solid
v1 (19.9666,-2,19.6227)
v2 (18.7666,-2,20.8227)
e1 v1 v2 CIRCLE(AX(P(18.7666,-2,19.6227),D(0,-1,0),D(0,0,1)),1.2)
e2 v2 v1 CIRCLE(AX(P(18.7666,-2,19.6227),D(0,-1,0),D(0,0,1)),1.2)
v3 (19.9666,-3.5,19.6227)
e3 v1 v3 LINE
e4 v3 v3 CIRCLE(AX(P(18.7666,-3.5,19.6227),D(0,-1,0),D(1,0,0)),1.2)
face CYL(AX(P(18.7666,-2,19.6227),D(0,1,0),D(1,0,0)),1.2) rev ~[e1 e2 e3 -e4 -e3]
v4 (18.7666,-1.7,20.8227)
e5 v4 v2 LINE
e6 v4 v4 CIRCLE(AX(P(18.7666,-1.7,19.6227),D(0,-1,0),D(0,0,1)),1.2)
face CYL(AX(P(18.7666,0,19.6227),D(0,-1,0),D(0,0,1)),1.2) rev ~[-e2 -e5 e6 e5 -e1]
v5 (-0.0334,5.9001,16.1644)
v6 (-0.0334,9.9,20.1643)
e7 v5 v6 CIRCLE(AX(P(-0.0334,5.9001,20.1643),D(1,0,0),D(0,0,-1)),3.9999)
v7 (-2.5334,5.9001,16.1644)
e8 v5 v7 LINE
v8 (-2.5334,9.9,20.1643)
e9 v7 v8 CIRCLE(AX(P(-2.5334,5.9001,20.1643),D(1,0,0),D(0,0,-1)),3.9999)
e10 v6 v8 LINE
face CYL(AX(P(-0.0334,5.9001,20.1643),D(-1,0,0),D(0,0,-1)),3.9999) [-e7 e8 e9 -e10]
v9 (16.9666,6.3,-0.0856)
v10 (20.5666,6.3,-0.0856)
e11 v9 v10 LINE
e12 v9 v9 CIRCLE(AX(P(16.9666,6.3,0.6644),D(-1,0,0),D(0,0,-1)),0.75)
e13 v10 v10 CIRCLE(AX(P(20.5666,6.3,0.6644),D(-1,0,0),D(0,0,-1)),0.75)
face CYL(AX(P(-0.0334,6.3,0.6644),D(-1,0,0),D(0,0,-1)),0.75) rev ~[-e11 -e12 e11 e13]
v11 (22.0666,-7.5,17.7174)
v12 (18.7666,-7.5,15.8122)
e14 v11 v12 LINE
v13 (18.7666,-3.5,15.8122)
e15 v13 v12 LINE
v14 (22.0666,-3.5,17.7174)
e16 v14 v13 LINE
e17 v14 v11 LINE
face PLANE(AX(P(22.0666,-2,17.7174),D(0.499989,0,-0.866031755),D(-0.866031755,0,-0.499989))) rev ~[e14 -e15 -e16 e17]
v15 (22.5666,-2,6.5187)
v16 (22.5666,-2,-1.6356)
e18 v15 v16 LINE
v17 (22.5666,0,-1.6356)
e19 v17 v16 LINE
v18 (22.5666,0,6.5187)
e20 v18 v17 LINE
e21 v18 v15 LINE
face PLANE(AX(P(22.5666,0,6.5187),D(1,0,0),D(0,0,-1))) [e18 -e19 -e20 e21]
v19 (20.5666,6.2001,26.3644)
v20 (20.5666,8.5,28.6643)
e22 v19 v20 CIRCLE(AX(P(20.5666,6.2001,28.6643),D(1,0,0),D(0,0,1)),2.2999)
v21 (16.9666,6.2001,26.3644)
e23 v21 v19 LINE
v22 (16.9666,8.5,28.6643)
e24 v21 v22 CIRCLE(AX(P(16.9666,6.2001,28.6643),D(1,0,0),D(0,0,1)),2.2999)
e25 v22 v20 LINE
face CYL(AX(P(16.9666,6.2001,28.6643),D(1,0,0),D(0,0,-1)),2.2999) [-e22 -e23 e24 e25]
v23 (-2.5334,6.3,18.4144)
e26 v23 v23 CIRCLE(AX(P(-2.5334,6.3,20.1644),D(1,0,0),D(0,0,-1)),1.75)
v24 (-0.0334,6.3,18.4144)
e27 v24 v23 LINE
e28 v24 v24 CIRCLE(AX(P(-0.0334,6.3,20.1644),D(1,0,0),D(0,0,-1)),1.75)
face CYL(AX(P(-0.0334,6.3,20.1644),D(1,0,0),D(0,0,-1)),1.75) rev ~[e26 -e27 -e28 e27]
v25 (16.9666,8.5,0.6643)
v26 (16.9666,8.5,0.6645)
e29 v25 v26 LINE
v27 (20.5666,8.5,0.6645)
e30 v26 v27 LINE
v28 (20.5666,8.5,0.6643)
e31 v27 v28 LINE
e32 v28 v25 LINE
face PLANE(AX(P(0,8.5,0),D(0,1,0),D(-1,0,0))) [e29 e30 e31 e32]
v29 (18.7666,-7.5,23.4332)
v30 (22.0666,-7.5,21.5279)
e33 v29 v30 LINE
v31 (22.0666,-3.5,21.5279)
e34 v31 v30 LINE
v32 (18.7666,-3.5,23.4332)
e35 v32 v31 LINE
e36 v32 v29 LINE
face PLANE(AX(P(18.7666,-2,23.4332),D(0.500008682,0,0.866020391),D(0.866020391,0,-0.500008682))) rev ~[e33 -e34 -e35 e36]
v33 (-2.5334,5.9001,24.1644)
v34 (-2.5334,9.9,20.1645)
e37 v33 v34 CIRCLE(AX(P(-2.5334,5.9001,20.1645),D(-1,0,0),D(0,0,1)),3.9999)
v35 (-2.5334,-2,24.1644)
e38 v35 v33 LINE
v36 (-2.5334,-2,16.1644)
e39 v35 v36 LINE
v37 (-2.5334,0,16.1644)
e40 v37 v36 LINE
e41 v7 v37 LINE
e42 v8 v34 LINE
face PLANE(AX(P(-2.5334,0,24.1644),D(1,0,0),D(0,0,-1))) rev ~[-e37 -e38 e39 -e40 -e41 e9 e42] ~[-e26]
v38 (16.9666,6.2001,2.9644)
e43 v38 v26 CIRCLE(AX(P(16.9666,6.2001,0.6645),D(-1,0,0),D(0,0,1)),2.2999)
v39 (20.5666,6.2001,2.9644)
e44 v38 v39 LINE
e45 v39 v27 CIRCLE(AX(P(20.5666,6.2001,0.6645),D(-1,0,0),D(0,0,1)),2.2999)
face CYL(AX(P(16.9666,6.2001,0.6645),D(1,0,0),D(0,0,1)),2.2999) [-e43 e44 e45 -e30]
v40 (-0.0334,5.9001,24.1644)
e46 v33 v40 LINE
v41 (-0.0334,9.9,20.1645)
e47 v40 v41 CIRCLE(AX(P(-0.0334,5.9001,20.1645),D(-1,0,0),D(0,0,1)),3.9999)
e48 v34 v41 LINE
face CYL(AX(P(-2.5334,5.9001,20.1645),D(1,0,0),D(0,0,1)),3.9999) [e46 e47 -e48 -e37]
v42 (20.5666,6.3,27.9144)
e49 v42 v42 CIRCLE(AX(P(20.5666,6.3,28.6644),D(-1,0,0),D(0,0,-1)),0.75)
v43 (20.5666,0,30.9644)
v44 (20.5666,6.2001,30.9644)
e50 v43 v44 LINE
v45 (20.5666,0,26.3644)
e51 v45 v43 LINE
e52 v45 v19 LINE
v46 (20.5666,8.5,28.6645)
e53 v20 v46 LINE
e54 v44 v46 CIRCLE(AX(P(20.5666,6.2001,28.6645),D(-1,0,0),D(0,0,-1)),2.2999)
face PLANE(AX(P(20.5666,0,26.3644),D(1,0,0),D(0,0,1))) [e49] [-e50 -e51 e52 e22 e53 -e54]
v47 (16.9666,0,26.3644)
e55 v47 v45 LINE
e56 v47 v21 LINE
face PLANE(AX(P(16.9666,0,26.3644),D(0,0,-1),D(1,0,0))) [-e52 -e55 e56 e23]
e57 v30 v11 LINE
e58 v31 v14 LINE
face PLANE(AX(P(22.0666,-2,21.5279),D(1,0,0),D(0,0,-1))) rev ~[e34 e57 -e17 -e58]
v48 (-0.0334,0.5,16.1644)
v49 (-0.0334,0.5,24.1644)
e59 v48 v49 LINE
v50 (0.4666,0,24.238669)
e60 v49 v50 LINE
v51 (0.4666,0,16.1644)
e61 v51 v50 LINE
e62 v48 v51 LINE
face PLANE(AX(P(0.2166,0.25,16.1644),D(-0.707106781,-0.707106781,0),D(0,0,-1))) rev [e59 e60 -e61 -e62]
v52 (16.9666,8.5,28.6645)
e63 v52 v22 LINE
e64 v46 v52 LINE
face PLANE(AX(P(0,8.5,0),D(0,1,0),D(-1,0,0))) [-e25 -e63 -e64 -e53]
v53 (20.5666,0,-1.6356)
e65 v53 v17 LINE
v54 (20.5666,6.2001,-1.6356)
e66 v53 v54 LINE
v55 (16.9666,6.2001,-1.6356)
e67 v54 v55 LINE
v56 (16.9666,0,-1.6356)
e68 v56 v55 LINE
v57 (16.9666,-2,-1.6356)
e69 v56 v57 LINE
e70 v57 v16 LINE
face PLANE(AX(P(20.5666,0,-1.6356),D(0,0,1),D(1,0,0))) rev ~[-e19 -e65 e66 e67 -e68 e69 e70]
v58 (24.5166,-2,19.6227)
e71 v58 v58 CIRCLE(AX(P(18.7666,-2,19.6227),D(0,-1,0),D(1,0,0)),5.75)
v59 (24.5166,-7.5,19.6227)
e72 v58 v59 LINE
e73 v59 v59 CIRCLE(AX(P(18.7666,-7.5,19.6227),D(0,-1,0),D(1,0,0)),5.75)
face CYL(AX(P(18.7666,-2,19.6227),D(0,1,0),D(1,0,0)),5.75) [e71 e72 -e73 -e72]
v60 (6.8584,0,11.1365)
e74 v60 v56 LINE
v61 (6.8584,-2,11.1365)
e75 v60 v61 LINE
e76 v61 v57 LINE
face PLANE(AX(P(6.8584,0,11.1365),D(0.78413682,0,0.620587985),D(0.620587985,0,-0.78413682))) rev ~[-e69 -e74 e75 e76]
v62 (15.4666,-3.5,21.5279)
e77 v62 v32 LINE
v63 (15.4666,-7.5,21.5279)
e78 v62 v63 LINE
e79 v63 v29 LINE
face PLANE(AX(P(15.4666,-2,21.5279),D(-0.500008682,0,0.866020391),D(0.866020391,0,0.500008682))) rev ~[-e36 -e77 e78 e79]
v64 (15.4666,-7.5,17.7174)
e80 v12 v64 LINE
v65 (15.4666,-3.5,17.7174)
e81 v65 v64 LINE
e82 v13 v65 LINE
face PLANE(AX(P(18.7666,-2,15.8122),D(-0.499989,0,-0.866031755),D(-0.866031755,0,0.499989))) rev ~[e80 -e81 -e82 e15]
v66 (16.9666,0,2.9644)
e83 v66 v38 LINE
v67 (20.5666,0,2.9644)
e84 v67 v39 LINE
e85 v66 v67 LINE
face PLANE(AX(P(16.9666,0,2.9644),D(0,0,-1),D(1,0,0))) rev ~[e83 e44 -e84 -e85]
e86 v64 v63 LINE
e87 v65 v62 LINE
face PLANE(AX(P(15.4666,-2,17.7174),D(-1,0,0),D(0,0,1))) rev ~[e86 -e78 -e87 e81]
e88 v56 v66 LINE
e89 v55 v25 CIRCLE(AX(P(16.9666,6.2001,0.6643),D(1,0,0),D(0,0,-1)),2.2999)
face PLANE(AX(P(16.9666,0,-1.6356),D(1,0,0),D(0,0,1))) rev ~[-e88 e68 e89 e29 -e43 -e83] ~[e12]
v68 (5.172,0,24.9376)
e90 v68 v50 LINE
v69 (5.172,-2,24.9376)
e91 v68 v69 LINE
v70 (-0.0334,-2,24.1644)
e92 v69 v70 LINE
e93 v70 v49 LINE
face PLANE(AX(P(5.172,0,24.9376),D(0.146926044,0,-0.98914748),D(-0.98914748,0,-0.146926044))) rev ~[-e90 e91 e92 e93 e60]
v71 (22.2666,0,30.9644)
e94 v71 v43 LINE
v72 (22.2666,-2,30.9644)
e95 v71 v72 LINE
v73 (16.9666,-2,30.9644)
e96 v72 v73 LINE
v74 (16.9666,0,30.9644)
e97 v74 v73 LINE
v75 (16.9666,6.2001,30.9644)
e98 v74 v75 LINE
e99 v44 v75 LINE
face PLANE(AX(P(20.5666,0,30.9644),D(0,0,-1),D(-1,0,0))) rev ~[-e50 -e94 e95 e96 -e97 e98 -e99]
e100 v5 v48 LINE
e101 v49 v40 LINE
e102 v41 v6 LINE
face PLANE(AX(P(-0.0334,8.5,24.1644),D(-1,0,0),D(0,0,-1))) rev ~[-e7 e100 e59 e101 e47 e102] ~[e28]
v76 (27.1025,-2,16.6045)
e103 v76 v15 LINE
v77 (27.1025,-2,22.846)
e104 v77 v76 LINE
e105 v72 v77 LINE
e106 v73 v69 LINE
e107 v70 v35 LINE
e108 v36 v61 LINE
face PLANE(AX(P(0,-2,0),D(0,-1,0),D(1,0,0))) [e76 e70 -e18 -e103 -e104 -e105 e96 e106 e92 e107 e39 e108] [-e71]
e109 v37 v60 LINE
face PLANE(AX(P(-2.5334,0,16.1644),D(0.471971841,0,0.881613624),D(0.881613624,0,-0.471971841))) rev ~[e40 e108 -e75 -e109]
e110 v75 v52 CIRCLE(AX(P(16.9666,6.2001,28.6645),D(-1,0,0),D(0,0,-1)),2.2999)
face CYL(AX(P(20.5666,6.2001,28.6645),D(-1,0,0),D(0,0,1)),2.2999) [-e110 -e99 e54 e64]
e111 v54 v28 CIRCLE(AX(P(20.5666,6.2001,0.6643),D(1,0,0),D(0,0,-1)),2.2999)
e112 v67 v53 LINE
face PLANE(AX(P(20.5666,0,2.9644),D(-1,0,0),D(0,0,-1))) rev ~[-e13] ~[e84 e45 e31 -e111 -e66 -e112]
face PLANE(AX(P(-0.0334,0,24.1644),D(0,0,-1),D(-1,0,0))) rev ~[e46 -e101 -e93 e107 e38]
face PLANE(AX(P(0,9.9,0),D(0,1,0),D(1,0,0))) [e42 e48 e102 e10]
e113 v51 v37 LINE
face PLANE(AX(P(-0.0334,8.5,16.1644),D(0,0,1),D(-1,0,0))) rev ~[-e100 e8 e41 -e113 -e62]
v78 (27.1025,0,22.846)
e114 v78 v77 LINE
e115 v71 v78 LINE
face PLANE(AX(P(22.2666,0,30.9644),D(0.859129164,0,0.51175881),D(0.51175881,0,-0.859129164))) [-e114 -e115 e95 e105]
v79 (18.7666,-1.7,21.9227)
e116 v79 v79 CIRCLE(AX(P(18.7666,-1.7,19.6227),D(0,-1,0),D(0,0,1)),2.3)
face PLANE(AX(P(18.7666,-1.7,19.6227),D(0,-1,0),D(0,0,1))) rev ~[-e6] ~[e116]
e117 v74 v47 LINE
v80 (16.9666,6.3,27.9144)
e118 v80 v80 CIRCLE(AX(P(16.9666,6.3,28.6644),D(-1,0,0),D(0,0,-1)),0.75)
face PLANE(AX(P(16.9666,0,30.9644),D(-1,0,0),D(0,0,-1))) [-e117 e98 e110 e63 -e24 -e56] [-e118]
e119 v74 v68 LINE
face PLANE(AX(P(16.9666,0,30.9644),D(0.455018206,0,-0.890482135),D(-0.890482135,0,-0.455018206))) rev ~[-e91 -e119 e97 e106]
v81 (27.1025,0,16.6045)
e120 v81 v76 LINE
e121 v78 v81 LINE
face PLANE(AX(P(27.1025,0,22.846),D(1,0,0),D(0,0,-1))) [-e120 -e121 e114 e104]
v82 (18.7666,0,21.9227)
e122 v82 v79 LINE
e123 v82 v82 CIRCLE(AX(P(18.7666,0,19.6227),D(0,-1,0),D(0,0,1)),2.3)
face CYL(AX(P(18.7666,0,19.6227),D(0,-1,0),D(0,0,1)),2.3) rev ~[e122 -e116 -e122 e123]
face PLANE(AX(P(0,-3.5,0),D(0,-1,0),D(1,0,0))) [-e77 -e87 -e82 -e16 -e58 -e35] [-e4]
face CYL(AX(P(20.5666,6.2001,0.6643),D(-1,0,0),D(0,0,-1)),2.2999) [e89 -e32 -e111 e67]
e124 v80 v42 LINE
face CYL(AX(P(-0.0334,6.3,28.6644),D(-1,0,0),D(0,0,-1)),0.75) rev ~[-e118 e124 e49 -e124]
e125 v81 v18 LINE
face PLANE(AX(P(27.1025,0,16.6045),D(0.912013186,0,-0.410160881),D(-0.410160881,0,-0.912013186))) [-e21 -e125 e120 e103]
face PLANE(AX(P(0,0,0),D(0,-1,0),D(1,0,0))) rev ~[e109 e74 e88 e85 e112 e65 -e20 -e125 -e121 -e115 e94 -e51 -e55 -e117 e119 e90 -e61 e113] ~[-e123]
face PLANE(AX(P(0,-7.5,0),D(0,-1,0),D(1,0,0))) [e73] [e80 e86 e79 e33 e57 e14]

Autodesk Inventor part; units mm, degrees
ref_plane "YZ Plane" through (0, 0, 0) normal (1, 0, 0) x (0, 1, 0)
ref_plane "XZ Plane" through (0, 0, 0) normal (0, 1, 0) x (-1, 0, 0)
ref_plane "XY Plane" through (0, 0, 0) normal (0, 0, 1) x (1, 0, 0)
sketch "Sketch2" plane through (0, 0, 0) normal (0, 1, 0) x (-1, 0, 0)
  line L0 (2.5334, 16.1644) -> (0.0334, 16.1644)
  line L1 (0.0334, 16.1644) -> (0.0334, 24.1644)
  line L2 (0.0334, 24.1644) -> (2.5334, 24.1644)
  line L3 (2.5334, 24.1644) -> (2.5334, 16.1644)
  line L4 (-20.5666, -1.6356) -> (-16.9666, -1.6356)
  line L5 (-16.9666, -1.6356) -> (-16.9666, 2.9644)
  line L6 (-16.9666, 2.9644) -> (-20.5666, 2.9644)
  line L7 (-20.5666, 2.9644) -> (-20.5666, -1.6356)
  line L8 (-20.5666, 30.9644) -> (-16.9666, 30.9644)
  line L9 (-16.9666, 30.9644) -> (-16.9666, 26.3644)
  line L10 (-16.9666, 26.3644) -> (-20.5666, 26.3644)
  line L11 (-20.5666, 26.3644) -> (-20.5666, 30.9644)
  point P0 (0, 0)
  point P1 (-20.5666, 0.6644)
  point P2 (-20.5666, 28.6644)
  point P3 (0.0334, 20.1644)
  dimension "d4" = 4.6
  dimension "d5" = 3.6
  dimension "d6" = 2.5
  dimension "d7" = 8
  dimension "d8" = 28
  dimension "d9" = 8.5
  dimension "d59" = 20.6
extrude "Extrusion2" add sketch "Sketch2" along normal blind 8.5
sketch "Sketch3" plane through (0, 8.5, 0) normal (0, 1, 0) x (1, 0, 0)
  line L0 (-2.5334, -24.1644) -> (-0.0334, -24.1644)
  line L1 (-0.0334, -24.1644) -> (-0.0334, -16.1644)
  line L2 (-0.0334, -16.1644) -> (-2.5334, -16.1644)
  line L3 (-2.5334, -16.1644) -> (-2.5334, -24.1644)
  point P0 (0, 0)
extrude "Extrusion3" add sketch "Sketch3" along normal blind 1.4
fillet "Fillet1" radius 2.3 4 edges at (18.7666, 8.5, 30.9644) (18.7666, 8.5, 26.3644) (18.7666, 8.5, 2.9644) (18.7666, 8.5, -1.6356)
fillet "Fillet2" radius 4 2 edges at (-1.2834, 9.9, 24.1644) (-1.2834, 9.9, 16.1644)
sketch "Sketch4" plane through (-0.0334, 0, 24.1644) normal (1, 0, 0) x (0, 0, -1)
  line L0 (8, 0) -> (0, 0) projected
  line L1 (4, 0) -> (4, 9.2517) construction
  line L2 (-6.8, 0) -> (-2.2, 0) construction
  line L3 (25.8, 0) -> (21.2, 0) construction
  line L4 (-4.5, 0) -> (-4.5, 8.5) construction
  arc A0 (-2.2, 6.2) -> (-6.8, 6.2) centre (-4.5, 6.2) ccw construction
  line L5 (23.5, 0) -> (23.5, 8.5) construction
  circle A1 centre (4, 6.3) radius 1.75
  circle A2 centre (23.5, 6.3) radius 0.75
  circle A3 centre (-4.5, 6.3) radius 0.75
  point P0 (24.1644, 0)
  dimension "d17" = 3.5
  dimension "d19" = 1.5
  dimension "d20" = 1.5
  dimension "d21" = 6.3
  dimension "d22" = 6.3
  dimension "d23" = 6.3
extrude "Extrusion4" cut sketch "Sketch4" along normal through all both and the other way through all
sketch "Sketch5" plane through (0, 0, 0) normal (0, -1, 0) x (1, 0, 0)
  line L0 (-2.5334, 16.1644) -> (6.8584, 11.1365)
  line L1 (6.8584, 11.1365) -> (16.9666, -1.6356)
  line L2 (16.9666, -1.6356) -> (20.5666, -1.6356)
  line L3 (20.5666, -1.6356) -> (16.9666, -1.6356) projected
  line L4 (20.5666, -1.6356) -> (22.5666, -1.6356)
  line L5 (22.2666, 30.9644) -> (20.5666, 30.9644)
  line L6 (20.5666, 30.9644) -> (16.9666, 30.9644)
  line L7 (16.9666, 30.9644) -> (5.172, 24.9376)
  line L8 (5.172, 24.9376) -> (-0.0334, 24.1644)
  line L9 (-0.0334, 24.1644) -> (-2.5334, 24.1644)
  line L10 (-0.0334, 24.1644) -> (-2.5334, 24.1644) projected
  line L11 (-2.5334, 24.1644) -> (-2.5334, 16.1644)
  line L12 (22.2666, 30.9644) -> (27.1025, 22.846)
  line L13 (27.1025, 22.846) -> (27.1025, 16.6045)
  line L14 (27.1025, 16.6045) -> (22.5666, 6.5187)
  line L15 (22.5666, 6.5187) -> (22.5666, -1.6356)
  point P0 (0, 0)
  dimension "d26" = 2
extrude "Extrusion5" add sketch "Sketch5" along normal blind 2
sketch "Sketch7" plane through (0, -2, 0) normal (0, -1, 0) x (1, 0, 0)
  line L0 (16.9666, 2.9644) -> (20.5666, 2.9644) projected
  line L1 (18.7666, 2.9644) -> (18.7666, 26.3644) construction
  line L2 (20.5666, 26.3644) -> (16.9666, 26.3644) projected
  line L3 (18.7666, 15.8122) -> (15.4666, 17.7174)
  line L4 (15.4666, 17.7174) -> (15.4666, 21.5279)
  line L5 (15.4666, 21.5279) -> (18.7666, 23.4332)
  line L6 (18.7666, 23.4332) -> (22.0666, 21.5279)
  line L7 (22.0666, 21.5279) -> (22.0666, 17.7174)
  line L8 (22.0666, 17.7174) -> (18.7666, 15.8122)
  line L9 (20.5666, 29.4144) -> (20.5666, 27.9144) construction
  line L10 (20.5666, 29.5605) -> (16.9666, 27.9144) construction
  line L11 (16.9666, 27.9144) -> (16.9666, 29.4144) construction
  line L12 (20.5666, 26.7294) -> (15.111, 29.4144) construction
  line L13 (16.9666, 29.4144) -> (20.5666, 29.4144) construction
  circle A0 centre (18.7666, 19.6227) radius 5.75
  point P0 (0, 0)
  point P1 (17.8388, 28.0719)
  dimension "d29" = 8.5
  dimension "d30" = 6.6
  dimension "d31" = 11.5
extrude "Extrusion6" add sketch "Sketch7" along normal blind 5.5
chamfer "Chamfer1" distance 0.5 angle 45 1 edges at (-0.0334, 0, 20.1644)
hole "Hole1" at (18.7666, 0, 19.6227) direction (0, -1, 0) diameter 2.4 end through all
hole "Hole2" at (18.7666, 0, 19.6227) direction (0, -1, 0) diameter 4.6 depth 1.7
sketch "Sketch8" plane through (0, -2, 0) normal (0, -1, 0) x (1, 0, 0)
  line L0 (18.7666, 23.4332) -> (22.0666, 21.5279)
  line L1 (22.0666, 21.5279) -> (22.0666, 17.7174)
  line L2 (22.0666, 17.7174) -> (18.7666, 15.8122)
  line L3 (18.7666, 15.8122) -> (15.4666, 17.7174)
  line L4 (15.4666, 17.7174) -> (15.4666, 21.5279)
  line L5 (15.4666, 21.5279) -> (18.7666, 23.4332)
  circle A0 centre (18.7666, 19.6227) radius 1.2
  point P0 (0, 0)
extrude "Extrusion7" add sketch "Sketch8" along normal blind 1.5
properties part number "servo_gimbal_interpart_1" material "ABS Plastic"
